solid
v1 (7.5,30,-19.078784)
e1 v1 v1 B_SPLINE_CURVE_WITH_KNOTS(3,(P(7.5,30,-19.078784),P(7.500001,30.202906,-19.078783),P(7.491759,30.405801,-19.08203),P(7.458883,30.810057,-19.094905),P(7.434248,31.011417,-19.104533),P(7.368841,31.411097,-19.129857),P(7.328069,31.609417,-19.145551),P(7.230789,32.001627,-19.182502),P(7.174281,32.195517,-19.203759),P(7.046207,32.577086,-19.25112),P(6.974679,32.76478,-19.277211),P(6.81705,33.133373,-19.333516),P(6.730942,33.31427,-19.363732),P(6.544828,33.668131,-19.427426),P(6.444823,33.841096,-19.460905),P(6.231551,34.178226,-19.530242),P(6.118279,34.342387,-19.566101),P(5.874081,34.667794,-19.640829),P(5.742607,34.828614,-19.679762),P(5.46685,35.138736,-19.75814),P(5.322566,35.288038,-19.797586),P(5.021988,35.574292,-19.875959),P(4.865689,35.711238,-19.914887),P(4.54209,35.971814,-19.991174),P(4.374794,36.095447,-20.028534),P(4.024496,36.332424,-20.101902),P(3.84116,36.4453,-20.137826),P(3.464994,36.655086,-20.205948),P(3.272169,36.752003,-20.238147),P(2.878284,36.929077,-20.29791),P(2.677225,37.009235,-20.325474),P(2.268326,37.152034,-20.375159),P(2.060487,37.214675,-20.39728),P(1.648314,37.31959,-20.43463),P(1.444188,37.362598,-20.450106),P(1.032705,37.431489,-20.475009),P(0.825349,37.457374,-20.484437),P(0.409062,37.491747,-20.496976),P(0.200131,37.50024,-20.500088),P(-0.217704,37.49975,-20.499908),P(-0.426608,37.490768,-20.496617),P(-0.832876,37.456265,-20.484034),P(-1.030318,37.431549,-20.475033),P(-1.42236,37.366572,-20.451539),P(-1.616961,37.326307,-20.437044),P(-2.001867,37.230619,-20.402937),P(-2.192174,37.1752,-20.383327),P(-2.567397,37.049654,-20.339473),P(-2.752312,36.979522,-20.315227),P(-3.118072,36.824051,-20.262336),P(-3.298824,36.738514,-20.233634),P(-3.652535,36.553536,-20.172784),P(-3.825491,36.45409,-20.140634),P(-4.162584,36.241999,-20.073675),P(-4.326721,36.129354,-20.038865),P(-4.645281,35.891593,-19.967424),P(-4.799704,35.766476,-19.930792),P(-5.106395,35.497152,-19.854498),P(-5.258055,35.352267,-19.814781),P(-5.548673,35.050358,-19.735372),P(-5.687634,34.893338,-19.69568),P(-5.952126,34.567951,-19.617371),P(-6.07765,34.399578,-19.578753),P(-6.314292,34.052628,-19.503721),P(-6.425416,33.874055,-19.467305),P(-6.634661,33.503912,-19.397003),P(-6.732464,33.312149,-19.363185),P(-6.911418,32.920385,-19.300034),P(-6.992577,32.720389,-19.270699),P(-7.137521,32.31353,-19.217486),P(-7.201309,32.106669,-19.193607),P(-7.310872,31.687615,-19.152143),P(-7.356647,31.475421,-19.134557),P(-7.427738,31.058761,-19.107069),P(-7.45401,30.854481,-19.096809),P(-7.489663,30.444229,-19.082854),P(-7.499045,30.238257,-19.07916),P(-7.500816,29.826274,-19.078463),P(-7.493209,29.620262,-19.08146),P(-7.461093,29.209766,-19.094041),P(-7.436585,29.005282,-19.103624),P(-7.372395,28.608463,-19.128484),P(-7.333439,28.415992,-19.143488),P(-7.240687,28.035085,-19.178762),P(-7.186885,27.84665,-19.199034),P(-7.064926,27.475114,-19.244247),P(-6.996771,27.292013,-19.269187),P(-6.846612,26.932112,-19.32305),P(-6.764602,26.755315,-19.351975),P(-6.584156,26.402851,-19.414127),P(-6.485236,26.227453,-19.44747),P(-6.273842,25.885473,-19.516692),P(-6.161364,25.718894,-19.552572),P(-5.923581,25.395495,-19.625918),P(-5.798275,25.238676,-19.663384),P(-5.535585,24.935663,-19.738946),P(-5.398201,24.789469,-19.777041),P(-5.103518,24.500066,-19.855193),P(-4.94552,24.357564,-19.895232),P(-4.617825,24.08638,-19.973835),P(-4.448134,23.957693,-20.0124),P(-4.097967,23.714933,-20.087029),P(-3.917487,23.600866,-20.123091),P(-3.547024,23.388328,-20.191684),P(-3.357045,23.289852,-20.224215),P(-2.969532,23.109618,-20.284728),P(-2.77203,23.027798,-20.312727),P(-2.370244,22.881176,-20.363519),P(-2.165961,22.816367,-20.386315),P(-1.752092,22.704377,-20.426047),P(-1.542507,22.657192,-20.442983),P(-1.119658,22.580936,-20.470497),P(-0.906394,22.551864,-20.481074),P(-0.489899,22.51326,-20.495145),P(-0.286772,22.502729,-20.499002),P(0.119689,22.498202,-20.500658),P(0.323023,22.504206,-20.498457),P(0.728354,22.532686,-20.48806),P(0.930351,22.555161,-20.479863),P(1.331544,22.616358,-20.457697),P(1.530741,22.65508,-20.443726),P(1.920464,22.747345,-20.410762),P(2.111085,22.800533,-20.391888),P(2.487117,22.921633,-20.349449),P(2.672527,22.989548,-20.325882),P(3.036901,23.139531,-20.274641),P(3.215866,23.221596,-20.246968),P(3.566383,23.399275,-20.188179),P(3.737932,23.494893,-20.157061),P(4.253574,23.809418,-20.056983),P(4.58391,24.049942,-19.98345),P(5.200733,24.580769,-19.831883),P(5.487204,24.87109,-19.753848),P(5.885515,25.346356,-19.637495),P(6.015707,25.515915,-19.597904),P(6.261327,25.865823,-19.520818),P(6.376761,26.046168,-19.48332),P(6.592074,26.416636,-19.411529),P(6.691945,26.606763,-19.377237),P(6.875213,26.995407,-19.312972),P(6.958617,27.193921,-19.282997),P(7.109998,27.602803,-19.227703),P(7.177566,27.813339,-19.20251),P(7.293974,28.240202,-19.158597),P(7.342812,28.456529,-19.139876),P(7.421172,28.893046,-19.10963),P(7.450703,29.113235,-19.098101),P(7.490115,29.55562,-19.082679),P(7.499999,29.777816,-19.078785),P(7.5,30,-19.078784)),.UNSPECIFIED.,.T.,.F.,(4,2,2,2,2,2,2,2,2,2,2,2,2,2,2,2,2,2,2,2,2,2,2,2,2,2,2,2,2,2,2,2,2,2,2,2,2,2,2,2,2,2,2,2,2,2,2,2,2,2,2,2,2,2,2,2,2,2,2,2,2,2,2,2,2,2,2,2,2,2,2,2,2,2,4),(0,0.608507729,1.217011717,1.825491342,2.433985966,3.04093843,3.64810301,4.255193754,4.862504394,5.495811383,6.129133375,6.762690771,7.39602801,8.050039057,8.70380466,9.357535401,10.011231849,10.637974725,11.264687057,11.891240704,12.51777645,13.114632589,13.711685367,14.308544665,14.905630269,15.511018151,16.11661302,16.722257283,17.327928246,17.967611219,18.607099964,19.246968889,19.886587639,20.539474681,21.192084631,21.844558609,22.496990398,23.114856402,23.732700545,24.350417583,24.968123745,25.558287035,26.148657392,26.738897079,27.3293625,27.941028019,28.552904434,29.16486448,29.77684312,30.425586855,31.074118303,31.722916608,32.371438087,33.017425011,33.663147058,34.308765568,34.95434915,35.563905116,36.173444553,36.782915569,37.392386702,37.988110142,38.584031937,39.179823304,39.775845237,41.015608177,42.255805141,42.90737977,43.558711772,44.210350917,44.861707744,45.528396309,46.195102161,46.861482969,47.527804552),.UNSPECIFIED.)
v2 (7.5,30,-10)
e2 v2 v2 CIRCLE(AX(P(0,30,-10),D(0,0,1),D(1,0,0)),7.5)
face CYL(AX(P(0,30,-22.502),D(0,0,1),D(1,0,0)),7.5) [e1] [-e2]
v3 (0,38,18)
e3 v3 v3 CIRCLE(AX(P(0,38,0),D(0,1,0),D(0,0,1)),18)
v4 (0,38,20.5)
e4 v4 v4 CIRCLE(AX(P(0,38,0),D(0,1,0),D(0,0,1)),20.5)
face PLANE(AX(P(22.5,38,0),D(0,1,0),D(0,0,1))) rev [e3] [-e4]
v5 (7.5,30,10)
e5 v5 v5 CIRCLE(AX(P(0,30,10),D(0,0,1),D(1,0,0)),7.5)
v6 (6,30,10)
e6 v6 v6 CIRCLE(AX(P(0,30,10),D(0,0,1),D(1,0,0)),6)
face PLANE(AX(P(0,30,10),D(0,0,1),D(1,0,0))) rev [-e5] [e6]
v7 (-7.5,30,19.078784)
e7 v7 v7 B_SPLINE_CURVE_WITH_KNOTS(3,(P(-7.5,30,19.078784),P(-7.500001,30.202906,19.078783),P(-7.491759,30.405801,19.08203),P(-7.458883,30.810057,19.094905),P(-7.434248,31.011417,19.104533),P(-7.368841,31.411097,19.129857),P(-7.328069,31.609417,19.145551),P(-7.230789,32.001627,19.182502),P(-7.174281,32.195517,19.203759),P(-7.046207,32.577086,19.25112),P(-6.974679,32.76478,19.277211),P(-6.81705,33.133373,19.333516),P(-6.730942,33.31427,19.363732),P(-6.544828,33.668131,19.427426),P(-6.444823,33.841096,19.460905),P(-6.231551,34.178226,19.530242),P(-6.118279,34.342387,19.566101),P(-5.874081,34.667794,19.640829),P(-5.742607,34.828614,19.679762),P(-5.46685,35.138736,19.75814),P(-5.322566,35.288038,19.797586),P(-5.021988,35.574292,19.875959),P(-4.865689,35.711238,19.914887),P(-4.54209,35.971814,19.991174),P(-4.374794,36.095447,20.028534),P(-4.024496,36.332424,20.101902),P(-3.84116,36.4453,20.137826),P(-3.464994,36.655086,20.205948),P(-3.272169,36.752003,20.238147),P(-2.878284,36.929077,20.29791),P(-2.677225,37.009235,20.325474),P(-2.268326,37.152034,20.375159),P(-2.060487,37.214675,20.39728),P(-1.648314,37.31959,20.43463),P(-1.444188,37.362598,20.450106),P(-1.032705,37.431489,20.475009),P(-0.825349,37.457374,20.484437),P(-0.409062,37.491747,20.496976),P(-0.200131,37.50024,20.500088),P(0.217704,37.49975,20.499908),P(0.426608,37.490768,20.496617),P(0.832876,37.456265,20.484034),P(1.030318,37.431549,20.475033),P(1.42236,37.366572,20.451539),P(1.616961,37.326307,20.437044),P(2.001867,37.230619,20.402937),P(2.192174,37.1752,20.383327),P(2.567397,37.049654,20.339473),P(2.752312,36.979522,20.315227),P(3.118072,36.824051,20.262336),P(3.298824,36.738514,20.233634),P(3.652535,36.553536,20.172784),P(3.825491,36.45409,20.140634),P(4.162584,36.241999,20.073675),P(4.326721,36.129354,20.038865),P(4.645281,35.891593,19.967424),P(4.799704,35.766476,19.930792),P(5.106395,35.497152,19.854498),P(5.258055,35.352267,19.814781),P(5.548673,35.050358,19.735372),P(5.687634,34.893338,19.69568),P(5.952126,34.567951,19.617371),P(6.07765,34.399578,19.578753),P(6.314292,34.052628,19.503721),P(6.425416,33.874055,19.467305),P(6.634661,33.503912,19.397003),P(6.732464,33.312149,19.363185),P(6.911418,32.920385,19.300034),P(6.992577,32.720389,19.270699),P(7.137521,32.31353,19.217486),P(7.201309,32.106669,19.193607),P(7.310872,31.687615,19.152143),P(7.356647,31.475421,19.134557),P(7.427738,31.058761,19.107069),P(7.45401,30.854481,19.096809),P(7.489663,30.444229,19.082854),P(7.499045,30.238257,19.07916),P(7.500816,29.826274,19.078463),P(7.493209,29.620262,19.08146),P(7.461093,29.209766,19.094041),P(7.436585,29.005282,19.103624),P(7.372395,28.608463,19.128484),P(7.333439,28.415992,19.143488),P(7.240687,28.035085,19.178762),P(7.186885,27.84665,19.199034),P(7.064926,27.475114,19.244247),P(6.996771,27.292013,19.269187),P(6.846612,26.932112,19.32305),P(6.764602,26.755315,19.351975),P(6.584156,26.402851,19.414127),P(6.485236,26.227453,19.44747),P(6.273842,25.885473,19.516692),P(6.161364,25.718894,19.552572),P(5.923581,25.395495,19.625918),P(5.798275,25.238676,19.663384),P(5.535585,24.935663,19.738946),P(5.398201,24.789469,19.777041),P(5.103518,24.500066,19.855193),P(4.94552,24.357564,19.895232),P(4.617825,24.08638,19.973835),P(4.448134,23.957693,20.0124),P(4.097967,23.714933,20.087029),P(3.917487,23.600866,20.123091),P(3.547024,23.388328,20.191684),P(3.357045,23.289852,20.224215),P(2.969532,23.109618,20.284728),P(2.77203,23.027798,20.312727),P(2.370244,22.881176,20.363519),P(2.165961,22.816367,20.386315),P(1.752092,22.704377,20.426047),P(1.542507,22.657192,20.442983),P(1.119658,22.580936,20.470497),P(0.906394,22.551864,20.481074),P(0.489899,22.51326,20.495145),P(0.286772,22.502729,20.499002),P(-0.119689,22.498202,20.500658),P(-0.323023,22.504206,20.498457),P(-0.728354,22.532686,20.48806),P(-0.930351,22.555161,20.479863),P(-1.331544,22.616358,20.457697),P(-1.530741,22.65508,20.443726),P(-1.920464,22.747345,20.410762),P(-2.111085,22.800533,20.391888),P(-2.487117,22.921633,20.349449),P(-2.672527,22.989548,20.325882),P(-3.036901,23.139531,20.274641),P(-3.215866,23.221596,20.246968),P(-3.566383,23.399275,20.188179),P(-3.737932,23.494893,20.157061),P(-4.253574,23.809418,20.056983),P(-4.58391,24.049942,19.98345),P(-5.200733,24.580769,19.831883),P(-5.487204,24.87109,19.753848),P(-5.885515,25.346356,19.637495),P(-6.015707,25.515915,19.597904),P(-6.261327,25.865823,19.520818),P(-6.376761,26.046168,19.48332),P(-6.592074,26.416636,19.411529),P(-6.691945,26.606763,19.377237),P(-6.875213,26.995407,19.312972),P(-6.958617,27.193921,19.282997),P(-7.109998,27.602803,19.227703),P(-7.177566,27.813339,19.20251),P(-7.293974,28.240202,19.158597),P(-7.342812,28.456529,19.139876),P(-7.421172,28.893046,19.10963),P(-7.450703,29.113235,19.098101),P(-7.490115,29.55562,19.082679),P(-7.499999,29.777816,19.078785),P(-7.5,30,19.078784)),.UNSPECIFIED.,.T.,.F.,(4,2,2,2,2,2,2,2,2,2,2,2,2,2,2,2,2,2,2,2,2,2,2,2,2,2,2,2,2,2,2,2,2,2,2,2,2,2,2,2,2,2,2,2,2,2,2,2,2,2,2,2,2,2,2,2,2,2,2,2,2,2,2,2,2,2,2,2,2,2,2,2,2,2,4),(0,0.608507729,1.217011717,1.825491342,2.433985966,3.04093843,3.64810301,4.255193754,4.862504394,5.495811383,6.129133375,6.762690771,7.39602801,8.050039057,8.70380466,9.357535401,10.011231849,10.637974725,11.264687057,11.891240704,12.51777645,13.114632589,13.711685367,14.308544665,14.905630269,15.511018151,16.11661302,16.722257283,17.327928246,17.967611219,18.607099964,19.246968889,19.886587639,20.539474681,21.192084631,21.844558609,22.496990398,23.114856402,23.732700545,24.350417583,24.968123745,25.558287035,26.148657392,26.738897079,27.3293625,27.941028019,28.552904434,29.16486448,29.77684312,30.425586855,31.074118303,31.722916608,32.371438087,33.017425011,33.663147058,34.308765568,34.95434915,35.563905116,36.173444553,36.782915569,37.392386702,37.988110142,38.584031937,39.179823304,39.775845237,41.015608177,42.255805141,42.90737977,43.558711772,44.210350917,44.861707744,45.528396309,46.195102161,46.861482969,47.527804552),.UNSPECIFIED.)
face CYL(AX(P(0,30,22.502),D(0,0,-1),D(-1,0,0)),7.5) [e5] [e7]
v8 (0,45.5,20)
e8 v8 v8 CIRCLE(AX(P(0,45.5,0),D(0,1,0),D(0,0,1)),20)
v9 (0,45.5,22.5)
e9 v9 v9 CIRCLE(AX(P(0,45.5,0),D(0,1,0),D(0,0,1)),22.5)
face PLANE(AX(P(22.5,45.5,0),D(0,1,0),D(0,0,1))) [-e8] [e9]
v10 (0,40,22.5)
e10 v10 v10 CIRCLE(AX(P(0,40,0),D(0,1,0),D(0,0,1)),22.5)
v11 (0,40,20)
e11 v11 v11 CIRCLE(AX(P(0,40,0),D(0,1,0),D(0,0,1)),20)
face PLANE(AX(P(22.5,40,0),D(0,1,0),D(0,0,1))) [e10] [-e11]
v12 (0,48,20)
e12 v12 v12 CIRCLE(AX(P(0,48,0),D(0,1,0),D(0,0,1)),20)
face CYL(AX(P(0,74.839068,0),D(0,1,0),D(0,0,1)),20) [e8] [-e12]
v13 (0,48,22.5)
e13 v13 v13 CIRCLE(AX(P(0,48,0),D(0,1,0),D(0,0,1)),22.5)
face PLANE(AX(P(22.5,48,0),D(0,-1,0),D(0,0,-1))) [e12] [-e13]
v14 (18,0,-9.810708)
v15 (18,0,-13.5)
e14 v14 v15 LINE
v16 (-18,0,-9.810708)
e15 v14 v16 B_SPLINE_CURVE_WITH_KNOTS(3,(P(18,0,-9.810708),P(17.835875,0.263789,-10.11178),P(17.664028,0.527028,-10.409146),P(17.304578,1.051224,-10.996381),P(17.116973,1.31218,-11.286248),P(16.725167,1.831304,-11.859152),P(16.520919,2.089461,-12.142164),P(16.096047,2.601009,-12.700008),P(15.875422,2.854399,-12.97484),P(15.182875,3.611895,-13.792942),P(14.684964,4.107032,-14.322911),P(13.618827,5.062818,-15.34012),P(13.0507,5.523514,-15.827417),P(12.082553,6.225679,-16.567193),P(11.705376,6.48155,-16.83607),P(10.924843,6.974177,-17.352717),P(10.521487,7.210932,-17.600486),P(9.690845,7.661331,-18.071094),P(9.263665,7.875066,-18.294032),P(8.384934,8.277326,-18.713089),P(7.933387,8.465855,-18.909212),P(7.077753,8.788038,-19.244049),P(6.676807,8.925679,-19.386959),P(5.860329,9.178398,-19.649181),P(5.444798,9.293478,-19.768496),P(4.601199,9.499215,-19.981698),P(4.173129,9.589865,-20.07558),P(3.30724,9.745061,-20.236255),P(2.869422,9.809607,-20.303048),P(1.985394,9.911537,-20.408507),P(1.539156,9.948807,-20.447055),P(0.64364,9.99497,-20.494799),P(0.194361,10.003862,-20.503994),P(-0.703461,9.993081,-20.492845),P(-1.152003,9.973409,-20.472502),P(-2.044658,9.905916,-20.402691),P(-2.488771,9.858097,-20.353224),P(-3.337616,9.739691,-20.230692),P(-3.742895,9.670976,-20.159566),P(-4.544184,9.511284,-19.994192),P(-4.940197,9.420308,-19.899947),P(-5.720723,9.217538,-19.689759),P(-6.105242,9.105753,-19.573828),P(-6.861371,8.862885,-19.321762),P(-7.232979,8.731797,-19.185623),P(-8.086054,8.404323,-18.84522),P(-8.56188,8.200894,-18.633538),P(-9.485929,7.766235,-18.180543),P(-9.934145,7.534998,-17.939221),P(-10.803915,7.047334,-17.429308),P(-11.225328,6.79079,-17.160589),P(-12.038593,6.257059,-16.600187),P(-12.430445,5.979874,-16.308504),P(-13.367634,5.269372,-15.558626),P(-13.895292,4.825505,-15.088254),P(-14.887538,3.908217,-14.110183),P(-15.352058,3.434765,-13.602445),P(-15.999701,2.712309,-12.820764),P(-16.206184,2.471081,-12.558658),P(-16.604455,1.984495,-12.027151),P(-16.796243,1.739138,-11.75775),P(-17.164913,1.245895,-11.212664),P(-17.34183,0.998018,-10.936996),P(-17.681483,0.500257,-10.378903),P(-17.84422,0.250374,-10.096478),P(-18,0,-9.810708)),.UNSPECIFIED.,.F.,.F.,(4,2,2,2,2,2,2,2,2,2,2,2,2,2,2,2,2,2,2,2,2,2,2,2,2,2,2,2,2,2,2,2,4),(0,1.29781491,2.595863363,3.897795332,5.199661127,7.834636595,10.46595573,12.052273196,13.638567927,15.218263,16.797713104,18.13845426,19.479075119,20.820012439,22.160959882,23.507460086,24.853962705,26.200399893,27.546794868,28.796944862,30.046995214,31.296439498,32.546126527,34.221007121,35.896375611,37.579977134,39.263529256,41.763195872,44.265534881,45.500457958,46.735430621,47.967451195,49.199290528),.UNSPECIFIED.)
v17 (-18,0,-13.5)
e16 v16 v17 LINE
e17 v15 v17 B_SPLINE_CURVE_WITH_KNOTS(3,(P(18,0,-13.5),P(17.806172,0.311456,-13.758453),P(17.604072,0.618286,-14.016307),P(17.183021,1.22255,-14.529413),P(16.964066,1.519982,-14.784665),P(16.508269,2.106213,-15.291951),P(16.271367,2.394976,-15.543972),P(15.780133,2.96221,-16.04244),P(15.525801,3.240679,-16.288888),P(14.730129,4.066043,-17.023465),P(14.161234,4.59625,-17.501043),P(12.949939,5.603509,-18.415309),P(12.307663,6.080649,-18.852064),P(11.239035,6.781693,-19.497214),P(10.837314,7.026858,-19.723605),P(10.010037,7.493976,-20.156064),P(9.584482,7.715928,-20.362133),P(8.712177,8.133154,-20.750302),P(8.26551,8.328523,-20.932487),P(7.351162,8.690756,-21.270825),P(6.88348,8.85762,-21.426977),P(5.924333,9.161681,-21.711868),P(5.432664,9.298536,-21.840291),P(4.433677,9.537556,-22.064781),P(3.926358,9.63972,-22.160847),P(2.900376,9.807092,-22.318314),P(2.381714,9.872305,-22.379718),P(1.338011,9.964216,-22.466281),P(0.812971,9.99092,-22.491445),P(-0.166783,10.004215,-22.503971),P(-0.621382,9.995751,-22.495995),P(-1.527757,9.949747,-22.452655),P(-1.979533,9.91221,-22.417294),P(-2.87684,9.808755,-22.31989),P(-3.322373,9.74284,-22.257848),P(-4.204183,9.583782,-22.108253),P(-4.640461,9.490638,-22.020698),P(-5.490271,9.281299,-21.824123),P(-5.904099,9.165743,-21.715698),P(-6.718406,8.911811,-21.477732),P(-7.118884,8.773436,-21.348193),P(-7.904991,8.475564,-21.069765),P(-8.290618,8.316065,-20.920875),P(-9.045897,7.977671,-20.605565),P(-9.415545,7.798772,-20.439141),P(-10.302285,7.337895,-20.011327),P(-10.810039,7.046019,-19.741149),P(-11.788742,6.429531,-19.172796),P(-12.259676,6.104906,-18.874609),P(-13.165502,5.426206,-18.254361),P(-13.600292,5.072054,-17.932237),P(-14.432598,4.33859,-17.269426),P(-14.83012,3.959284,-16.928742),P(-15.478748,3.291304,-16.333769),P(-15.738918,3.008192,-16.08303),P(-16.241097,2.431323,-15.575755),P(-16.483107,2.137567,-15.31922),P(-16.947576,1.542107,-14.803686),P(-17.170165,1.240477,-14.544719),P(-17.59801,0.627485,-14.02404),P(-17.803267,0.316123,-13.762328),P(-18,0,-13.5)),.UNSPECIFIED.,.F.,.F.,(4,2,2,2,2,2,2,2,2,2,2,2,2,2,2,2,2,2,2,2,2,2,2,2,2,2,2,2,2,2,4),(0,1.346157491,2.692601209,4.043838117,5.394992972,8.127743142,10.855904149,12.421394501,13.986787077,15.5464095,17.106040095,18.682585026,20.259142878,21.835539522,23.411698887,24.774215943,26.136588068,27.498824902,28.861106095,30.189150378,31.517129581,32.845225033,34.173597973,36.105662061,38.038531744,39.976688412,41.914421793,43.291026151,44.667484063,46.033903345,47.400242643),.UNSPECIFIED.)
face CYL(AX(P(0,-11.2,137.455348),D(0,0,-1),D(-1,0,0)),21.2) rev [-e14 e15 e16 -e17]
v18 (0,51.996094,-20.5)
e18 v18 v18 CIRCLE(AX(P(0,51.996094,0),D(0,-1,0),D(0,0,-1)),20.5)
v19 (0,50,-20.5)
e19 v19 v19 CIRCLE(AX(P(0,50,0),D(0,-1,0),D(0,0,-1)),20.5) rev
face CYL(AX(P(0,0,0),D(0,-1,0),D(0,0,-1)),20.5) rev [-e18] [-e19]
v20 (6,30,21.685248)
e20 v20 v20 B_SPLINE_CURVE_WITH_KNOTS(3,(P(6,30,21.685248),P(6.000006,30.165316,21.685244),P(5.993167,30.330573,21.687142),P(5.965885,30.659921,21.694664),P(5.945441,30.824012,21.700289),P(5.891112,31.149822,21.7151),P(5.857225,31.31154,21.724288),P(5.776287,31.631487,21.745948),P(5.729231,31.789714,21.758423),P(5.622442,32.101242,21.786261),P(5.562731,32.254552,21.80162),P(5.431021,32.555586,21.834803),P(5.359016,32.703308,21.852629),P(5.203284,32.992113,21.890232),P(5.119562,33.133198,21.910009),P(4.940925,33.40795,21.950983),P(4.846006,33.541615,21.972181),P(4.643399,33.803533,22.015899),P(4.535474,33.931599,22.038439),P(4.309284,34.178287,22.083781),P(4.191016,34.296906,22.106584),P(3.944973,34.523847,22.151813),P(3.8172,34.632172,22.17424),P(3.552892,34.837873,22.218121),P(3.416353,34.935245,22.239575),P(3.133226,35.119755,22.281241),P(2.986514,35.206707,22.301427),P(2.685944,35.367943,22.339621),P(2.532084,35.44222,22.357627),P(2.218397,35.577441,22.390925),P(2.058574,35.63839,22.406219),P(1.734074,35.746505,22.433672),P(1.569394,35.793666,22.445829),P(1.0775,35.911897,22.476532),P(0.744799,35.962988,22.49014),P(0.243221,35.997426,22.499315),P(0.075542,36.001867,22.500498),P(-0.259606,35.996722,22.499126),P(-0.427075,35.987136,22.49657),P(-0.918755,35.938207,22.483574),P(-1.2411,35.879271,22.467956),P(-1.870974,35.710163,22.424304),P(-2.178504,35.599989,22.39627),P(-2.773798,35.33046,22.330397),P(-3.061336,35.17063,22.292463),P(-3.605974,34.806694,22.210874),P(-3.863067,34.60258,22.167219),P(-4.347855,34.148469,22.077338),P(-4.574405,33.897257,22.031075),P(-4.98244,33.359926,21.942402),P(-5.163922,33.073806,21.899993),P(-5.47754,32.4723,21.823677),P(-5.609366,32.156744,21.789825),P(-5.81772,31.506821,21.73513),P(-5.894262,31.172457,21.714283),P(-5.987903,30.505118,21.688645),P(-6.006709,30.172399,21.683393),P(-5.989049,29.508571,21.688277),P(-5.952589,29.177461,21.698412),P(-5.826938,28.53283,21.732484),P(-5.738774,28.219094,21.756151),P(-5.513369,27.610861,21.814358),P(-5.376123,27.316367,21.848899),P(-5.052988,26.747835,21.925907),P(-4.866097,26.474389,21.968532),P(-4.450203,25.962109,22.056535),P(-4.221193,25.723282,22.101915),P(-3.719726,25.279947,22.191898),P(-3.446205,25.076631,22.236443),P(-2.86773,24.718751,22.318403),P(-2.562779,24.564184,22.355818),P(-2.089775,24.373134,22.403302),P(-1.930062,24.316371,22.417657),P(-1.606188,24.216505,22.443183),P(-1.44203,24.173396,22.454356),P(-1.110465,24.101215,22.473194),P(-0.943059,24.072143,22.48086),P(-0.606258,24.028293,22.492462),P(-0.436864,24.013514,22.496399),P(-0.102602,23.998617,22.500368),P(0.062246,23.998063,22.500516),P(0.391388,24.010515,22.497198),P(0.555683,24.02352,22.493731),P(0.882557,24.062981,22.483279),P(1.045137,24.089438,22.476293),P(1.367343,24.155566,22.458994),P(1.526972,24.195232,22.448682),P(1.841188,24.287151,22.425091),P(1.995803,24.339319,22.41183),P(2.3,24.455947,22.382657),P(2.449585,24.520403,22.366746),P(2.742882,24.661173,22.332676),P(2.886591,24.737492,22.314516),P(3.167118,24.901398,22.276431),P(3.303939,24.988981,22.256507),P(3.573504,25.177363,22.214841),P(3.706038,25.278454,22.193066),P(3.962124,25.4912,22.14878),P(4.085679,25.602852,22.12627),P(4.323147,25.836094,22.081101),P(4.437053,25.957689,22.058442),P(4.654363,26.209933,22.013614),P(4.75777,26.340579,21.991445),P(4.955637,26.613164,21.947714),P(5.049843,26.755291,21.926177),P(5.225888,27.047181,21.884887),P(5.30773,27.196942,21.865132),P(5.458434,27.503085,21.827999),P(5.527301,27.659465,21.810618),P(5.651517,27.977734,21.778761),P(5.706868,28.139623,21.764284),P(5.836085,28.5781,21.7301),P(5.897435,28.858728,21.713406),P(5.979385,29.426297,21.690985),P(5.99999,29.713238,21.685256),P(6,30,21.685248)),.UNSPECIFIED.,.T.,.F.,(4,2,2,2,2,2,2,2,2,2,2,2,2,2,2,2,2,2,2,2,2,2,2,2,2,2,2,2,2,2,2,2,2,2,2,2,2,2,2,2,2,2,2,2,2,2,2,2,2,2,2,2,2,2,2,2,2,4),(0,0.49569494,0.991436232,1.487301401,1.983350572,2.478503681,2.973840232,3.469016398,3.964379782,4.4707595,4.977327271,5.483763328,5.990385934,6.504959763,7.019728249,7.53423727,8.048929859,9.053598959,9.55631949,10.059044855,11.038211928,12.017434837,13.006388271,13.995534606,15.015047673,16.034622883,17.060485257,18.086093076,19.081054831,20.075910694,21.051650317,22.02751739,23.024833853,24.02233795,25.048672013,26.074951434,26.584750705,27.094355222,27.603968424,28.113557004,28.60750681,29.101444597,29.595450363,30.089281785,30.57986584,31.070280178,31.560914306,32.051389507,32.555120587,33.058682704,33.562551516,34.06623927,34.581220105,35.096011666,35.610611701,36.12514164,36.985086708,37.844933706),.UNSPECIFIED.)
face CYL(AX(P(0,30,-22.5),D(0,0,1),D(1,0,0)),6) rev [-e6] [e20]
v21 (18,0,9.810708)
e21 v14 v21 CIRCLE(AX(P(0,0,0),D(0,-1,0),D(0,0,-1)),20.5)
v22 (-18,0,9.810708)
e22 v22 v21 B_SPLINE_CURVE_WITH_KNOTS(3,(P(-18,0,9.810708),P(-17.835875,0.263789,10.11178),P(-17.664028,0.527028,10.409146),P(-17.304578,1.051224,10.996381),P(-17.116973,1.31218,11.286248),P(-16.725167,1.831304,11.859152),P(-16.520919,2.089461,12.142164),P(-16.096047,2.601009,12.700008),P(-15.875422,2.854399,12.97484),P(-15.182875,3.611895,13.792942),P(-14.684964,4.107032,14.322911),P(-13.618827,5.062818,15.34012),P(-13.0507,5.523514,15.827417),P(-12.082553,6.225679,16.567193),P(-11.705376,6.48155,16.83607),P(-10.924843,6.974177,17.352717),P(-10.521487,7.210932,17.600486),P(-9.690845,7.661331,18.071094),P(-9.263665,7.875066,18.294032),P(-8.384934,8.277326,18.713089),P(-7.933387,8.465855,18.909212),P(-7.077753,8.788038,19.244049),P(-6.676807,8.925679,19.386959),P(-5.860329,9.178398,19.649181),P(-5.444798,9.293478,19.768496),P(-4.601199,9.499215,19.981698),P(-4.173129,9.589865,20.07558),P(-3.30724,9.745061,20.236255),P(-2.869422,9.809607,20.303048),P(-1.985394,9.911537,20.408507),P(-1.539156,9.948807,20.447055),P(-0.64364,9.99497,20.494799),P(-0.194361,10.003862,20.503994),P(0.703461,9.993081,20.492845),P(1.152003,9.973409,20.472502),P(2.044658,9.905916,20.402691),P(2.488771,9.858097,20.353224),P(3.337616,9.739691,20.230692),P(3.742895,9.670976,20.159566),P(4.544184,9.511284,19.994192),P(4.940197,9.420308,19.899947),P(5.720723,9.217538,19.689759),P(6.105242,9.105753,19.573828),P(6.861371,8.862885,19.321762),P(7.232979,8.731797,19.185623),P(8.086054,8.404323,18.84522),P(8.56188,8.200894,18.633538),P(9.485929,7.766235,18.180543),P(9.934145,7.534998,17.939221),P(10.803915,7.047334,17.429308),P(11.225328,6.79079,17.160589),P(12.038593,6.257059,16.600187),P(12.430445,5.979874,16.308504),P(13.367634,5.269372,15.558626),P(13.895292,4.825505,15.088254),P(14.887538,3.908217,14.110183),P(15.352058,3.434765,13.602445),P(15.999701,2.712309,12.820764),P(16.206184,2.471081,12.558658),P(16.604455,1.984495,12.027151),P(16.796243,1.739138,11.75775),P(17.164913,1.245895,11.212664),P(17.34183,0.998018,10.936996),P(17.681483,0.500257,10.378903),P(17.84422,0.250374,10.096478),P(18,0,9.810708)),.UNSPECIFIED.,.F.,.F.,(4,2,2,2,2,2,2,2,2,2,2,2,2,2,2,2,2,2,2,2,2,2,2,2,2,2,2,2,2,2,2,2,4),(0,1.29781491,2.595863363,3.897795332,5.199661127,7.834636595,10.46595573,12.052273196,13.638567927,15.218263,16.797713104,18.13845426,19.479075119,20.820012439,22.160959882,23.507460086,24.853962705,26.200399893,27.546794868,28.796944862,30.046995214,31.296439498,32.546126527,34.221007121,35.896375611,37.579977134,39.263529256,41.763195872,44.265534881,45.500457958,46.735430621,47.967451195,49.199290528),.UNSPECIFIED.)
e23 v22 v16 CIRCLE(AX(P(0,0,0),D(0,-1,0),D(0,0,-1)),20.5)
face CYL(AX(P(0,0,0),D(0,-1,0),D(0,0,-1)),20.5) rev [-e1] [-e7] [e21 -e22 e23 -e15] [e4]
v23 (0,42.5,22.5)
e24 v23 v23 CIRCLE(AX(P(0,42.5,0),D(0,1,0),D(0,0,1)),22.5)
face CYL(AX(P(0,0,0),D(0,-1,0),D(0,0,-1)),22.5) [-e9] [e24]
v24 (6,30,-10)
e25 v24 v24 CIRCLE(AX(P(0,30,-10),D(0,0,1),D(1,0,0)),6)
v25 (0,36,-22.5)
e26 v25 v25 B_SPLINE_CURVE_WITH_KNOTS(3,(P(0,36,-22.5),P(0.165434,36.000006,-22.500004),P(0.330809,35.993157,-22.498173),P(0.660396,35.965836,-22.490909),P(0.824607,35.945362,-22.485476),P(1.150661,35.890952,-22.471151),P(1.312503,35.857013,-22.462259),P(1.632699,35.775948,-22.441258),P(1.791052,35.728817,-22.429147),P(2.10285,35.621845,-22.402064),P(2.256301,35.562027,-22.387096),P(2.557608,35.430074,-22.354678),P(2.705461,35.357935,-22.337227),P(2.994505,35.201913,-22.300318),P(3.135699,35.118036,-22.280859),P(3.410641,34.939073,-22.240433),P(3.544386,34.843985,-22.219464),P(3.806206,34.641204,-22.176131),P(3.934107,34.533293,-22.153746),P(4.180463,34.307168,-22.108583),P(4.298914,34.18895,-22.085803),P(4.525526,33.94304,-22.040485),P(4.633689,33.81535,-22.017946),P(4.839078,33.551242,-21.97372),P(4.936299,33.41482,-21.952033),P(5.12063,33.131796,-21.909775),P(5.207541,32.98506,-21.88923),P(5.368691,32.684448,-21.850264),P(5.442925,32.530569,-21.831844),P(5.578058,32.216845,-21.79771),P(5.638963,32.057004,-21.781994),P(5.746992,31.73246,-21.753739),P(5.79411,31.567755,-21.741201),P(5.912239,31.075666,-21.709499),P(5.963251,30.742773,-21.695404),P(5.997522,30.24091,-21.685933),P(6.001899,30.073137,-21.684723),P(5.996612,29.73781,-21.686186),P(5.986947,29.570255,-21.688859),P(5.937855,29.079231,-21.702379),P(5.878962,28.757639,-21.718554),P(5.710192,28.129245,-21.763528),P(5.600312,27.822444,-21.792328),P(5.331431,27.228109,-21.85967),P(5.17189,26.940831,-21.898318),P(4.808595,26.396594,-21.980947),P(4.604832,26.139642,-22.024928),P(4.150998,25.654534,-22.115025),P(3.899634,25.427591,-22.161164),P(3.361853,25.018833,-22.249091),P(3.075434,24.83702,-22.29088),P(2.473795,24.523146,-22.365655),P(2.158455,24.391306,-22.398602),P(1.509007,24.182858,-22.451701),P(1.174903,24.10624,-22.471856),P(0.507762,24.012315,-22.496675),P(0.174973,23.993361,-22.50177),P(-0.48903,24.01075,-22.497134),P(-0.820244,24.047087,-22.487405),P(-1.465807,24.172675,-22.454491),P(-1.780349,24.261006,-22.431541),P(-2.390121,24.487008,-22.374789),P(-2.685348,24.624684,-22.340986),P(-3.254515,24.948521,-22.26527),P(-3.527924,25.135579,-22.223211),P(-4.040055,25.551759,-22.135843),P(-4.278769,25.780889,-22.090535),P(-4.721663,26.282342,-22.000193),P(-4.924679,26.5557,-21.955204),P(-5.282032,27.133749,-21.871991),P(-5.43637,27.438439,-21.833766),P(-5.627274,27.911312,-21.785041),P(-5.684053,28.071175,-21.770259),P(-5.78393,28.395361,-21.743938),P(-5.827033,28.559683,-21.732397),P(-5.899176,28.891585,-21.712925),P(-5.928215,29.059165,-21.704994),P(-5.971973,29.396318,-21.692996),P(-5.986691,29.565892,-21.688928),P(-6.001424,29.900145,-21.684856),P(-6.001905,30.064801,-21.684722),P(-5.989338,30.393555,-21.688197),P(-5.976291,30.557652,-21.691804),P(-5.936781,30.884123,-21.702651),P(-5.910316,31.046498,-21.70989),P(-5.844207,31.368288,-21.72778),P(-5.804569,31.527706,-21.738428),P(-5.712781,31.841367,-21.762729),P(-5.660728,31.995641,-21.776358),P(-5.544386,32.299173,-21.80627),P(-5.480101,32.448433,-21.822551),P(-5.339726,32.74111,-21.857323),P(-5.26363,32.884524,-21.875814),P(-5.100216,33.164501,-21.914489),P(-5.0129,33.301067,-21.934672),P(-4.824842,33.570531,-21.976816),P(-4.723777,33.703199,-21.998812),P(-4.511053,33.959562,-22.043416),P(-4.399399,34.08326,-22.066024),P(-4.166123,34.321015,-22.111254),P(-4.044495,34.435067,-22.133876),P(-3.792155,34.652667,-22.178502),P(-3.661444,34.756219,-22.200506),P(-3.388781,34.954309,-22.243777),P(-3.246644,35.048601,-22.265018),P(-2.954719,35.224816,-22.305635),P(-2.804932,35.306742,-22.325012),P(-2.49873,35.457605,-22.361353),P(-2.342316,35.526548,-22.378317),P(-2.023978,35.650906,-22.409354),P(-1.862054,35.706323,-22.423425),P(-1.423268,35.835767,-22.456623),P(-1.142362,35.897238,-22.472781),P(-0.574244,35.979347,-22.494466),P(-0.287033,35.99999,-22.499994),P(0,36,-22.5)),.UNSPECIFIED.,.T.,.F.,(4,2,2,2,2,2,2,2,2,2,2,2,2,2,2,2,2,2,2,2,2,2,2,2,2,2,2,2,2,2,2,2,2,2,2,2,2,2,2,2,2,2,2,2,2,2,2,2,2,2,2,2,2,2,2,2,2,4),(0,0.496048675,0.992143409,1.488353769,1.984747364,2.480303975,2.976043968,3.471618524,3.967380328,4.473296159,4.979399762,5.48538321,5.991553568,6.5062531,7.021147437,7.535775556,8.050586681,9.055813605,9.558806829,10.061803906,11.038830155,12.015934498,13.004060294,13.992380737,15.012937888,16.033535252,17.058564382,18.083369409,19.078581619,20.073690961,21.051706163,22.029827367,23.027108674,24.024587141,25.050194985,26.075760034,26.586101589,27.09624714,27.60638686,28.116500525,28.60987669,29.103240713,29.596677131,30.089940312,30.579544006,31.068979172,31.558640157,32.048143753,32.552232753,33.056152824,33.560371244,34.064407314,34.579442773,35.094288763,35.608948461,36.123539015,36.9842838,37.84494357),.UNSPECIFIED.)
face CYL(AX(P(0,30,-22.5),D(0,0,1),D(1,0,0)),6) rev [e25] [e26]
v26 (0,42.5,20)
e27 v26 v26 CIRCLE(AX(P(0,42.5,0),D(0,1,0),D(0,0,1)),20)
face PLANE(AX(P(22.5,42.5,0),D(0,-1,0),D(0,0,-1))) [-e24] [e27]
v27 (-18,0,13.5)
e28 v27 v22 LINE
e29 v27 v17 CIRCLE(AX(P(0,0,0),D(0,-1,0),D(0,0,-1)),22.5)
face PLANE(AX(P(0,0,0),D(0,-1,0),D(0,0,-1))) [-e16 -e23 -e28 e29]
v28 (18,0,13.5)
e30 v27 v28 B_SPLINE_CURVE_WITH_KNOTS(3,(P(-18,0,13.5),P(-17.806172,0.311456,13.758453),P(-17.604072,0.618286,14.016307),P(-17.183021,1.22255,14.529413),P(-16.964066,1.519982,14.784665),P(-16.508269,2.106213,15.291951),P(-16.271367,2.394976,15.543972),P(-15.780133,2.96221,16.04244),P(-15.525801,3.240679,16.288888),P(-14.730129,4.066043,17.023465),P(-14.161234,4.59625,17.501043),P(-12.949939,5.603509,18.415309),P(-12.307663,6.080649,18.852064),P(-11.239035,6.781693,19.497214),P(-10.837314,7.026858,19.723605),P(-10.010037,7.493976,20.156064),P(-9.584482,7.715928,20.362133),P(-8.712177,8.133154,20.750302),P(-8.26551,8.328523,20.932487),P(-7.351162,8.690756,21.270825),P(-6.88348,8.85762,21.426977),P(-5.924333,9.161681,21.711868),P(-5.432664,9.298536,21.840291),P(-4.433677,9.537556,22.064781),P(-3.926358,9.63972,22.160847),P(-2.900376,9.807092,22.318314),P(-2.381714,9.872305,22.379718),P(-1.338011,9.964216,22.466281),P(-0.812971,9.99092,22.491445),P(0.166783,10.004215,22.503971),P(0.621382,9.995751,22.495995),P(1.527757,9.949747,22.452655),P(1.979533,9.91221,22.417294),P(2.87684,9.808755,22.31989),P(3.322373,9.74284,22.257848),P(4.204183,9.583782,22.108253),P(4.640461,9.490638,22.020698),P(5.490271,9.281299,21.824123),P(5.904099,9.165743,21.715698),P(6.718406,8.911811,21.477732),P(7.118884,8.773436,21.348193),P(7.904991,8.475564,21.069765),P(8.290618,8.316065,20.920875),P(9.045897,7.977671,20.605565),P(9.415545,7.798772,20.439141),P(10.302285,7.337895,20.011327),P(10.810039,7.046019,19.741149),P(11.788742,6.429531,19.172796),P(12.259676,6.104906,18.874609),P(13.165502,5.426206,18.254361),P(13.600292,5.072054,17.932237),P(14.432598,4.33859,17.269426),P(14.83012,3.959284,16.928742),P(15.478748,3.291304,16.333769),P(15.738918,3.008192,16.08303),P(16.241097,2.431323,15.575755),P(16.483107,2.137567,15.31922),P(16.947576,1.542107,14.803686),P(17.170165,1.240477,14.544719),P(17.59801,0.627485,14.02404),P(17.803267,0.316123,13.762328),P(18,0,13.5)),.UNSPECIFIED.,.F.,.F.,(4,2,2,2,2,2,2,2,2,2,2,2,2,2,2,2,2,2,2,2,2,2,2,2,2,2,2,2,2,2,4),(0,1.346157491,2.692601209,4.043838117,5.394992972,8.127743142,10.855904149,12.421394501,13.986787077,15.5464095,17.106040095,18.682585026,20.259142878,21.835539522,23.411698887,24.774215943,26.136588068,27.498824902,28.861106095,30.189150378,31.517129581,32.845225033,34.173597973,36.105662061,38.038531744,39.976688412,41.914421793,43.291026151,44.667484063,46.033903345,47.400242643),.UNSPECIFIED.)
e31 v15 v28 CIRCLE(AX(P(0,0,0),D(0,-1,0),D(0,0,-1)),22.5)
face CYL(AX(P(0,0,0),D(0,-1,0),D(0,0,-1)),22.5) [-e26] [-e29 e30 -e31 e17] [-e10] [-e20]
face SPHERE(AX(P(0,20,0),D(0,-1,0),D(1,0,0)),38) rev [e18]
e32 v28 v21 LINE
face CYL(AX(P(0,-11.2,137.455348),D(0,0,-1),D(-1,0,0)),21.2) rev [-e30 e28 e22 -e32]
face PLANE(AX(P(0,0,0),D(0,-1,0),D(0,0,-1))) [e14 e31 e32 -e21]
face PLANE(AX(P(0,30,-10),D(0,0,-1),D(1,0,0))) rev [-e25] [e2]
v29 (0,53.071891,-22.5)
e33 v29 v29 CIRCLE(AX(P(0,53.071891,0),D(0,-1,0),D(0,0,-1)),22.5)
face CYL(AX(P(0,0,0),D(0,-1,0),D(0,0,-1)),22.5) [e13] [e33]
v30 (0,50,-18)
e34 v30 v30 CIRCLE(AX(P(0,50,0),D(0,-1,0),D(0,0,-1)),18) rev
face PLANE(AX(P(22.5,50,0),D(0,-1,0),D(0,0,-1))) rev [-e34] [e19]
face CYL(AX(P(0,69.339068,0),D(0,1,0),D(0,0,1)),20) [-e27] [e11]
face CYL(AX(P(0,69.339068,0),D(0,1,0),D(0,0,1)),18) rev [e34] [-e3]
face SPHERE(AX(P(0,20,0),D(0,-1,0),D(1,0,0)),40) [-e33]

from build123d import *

# Parameters (mm, degrees)
SZKIC2_W                         = 2.5
SZKIC2_H                         = 2.5
SZYK_LINIOWY1_COUNT              = 2
SZYK_LINIOWY1_PITCH              = 5.5
WYTNIJ_WYCI_GNI_CIE1_DEPTH       = 68.915388536
WYTNIJ_WYCI_GNI_CIE1_DEPTH_BACK  = 68.915388536
WYTNIJ_WYCI_GNI_CIE2_DEPTH       = 68.915388602
WYTNIJ_WYCI_GNI_CIE2_DEPTH_BACK  = 68.915388602
SZKIC4_R                         = 6
DODANIE_WYCI_GNI_CIE7_REACH      = 79.915
DODANIE_WYCI_GNI_CIE7_END_RADIUS = 20.5
DODANIE_WYCI_GNI_CIE7_START      = 10
SZKIC6_R                         = 7.5
SZKIC6_R_2                       = 6


# Read off the part's stored shape, not the designer's step: Skorupa2
with BuildPart() as part:
    # Szkic1 → Obrót1 (revolve)
    with BuildSketch(Plane.XY):
        with BuildLine():
            Line((0, 0), (0, 60))
            ThreePointArc((0, 60), (11.771243445, 58.228756555), (22.5, 53.071891388))
            Line((22.5, 53.071891388), (22.5, 0))
            Line((22.5, 0), (0, 0))
        make_face()
    revolve(axis=Axis((0, 0, 0), (0, 1, 0)))

    # Szkic2 → Wycięcie-obrót1 (revolve, cut)
    with BuildSketch(Plane.XY, mode=Mode.PRIVATE) as wyci_cie_obr_t1_sk:
        with Locations((21.25, 41.25)):
            Rectangle(SZKIC2_W, SZKIC2_H)
    wyci_cie_obr_t1 = revolve(wyci_cie_obr_t1_sk.sketch.rotate(Axis((0, 69.339068265, 0), (0, 1, 0)), 90), axis=Axis((0, 69.339068265, 0), (0, 1, 0)), mode=Mode.SUBTRACT)

    # Szyk liniowy1: Wycięcie-obrót1 ×2
    with Locations(*[(0, i * SZYK_LINIOWY1_PITCH, 0) for i in range(1, SZYK_LINIOWY1_COUNT)]):
        add(wyci_cie_obr_t1, mode=Mode.SUBTRACT)

    # Skorupa2 outline → Skorupa2 (revolve, cut)
    with BuildSketch(Plane.XY):
        with BuildLine():
            Line((0, 0), (20.5, 0))
            Line((20.5, 0), (20.5, 38))
            Line((20.5, 38), (18, 38))
            Line((18, 38), (18, 50))
            Line((18, 50), (20.5, 50))
            Line((20.5, 50), (20.500000011, 51.996093505))
            ThreePointArc((20.500000011, 51.996093505), (10.680553516, 56.468147425), (0, 58))
            Line((0, 58), (0, 0))
        make_face()
    revolve(axis=Axis((0, 0, 0), (0, 1, 0)), mode=Mode.SUBTRACT)

    # Szkic3 → Wytnij-wyciągnięcie1 (cut, two sides: drawn at the far end of the back side and taken through both)
    with BuildSketch(Plane.XY.offset(-WYTNIJ_WYCI_GNI_CIE1_DEPTH_BACK)):
        with BuildLine():
            Line((99.770112831, -131.416252764), (18, 0))
            ThreePointArc((18, 0), (0, 10), (-18, 0))
            Line((-18, 0), (-99.770112831, -131.416252764))
            Line((-99.770112831, -131.416252764), (-99.770112831, -440.974537052))
            Line((-99.770112831, -440.974537052), (99.770112831, -440.974537052))
            Line((99.770112831, -440.974537052), (99.770112831, -131.416252764))
        make_face()
    extrude(amount=WYTNIJ_WYCI_GNI_CIE1_DEPTH + WYTNIJ_WYCI_GNI_CIE1_DEPTH_BACK, mode=Mode.SUBTRACT)

    # Szkic4 → Wytnij-wyciągnięcie2 (cut, two sides: drawn at the far end of the back side and taken through both)
    with BuildSketch(Plane.XY.offset(-WYTNIJ_WYCI_GNI_CIE2_DEPTH_BACK)):
        with Locations((0, 30)):
            Circle(SZKIC4_R)
    extrude(amount=WYTNIJ_WYCI_GNI_CIE2_DEPTH + WYTNIJ_WYCI_GNI_CIE2_DEPTH_BACK, mode=Mode.SUBTRACT)

    # Dodanie-wyciągnięcie7: up to this cylinder (the profile starts inside it)
    dodanie_wyci_gni_cie7_end = Plane(origin=(0, 30, 0), z_dir=(0, -1, 0)) * Cylinder(DODANIE_WYCI_GNI_CIE7_END_RADIUS, 201.83, mode=Mode.PRIVATE)
    # Szkic6 → Dodanie-wyciągnięcie7 (add, up to the surface)
    with BuildSketch(Plane.XY.offset(DODANIE_WYCI_GNI_CIE7_START), mode=Mode.PRIVATE) as dodanie_wyci_gni_cie7_sk1:
        with Locations(Location((0, 30, 0), (0, 0, 180))):
            Circle(SZKIC6_R)
        with Locations((0, 30)):
            Circle(SZKIC6_R_2, mode=Mode.SUBTRACT)
    dodanie_wyci_gni_cie7_tool1 = extrude(dodanie_wyci_gni_cie7_sk1.sketch, amount=DODANIE_WYCI_GNI_CIE7_REACH, mode=Mode.PRIVATE) & dodanie_wyci_gni_cie7_end
    dodanie_wyci_gni_cie7 = dodanie_wyci_gni_cie7_tool1.solids().sort_by_distance((7.287868, 30, 10))[0]
    add(dodanie_wyci_gni_cie7)

    # Lustro1: Dodanie-wyciągnięcie7 across plane
    add(dodanie_wyci_gni_cie7.mirror(Plane.XY))


solid = part.part
